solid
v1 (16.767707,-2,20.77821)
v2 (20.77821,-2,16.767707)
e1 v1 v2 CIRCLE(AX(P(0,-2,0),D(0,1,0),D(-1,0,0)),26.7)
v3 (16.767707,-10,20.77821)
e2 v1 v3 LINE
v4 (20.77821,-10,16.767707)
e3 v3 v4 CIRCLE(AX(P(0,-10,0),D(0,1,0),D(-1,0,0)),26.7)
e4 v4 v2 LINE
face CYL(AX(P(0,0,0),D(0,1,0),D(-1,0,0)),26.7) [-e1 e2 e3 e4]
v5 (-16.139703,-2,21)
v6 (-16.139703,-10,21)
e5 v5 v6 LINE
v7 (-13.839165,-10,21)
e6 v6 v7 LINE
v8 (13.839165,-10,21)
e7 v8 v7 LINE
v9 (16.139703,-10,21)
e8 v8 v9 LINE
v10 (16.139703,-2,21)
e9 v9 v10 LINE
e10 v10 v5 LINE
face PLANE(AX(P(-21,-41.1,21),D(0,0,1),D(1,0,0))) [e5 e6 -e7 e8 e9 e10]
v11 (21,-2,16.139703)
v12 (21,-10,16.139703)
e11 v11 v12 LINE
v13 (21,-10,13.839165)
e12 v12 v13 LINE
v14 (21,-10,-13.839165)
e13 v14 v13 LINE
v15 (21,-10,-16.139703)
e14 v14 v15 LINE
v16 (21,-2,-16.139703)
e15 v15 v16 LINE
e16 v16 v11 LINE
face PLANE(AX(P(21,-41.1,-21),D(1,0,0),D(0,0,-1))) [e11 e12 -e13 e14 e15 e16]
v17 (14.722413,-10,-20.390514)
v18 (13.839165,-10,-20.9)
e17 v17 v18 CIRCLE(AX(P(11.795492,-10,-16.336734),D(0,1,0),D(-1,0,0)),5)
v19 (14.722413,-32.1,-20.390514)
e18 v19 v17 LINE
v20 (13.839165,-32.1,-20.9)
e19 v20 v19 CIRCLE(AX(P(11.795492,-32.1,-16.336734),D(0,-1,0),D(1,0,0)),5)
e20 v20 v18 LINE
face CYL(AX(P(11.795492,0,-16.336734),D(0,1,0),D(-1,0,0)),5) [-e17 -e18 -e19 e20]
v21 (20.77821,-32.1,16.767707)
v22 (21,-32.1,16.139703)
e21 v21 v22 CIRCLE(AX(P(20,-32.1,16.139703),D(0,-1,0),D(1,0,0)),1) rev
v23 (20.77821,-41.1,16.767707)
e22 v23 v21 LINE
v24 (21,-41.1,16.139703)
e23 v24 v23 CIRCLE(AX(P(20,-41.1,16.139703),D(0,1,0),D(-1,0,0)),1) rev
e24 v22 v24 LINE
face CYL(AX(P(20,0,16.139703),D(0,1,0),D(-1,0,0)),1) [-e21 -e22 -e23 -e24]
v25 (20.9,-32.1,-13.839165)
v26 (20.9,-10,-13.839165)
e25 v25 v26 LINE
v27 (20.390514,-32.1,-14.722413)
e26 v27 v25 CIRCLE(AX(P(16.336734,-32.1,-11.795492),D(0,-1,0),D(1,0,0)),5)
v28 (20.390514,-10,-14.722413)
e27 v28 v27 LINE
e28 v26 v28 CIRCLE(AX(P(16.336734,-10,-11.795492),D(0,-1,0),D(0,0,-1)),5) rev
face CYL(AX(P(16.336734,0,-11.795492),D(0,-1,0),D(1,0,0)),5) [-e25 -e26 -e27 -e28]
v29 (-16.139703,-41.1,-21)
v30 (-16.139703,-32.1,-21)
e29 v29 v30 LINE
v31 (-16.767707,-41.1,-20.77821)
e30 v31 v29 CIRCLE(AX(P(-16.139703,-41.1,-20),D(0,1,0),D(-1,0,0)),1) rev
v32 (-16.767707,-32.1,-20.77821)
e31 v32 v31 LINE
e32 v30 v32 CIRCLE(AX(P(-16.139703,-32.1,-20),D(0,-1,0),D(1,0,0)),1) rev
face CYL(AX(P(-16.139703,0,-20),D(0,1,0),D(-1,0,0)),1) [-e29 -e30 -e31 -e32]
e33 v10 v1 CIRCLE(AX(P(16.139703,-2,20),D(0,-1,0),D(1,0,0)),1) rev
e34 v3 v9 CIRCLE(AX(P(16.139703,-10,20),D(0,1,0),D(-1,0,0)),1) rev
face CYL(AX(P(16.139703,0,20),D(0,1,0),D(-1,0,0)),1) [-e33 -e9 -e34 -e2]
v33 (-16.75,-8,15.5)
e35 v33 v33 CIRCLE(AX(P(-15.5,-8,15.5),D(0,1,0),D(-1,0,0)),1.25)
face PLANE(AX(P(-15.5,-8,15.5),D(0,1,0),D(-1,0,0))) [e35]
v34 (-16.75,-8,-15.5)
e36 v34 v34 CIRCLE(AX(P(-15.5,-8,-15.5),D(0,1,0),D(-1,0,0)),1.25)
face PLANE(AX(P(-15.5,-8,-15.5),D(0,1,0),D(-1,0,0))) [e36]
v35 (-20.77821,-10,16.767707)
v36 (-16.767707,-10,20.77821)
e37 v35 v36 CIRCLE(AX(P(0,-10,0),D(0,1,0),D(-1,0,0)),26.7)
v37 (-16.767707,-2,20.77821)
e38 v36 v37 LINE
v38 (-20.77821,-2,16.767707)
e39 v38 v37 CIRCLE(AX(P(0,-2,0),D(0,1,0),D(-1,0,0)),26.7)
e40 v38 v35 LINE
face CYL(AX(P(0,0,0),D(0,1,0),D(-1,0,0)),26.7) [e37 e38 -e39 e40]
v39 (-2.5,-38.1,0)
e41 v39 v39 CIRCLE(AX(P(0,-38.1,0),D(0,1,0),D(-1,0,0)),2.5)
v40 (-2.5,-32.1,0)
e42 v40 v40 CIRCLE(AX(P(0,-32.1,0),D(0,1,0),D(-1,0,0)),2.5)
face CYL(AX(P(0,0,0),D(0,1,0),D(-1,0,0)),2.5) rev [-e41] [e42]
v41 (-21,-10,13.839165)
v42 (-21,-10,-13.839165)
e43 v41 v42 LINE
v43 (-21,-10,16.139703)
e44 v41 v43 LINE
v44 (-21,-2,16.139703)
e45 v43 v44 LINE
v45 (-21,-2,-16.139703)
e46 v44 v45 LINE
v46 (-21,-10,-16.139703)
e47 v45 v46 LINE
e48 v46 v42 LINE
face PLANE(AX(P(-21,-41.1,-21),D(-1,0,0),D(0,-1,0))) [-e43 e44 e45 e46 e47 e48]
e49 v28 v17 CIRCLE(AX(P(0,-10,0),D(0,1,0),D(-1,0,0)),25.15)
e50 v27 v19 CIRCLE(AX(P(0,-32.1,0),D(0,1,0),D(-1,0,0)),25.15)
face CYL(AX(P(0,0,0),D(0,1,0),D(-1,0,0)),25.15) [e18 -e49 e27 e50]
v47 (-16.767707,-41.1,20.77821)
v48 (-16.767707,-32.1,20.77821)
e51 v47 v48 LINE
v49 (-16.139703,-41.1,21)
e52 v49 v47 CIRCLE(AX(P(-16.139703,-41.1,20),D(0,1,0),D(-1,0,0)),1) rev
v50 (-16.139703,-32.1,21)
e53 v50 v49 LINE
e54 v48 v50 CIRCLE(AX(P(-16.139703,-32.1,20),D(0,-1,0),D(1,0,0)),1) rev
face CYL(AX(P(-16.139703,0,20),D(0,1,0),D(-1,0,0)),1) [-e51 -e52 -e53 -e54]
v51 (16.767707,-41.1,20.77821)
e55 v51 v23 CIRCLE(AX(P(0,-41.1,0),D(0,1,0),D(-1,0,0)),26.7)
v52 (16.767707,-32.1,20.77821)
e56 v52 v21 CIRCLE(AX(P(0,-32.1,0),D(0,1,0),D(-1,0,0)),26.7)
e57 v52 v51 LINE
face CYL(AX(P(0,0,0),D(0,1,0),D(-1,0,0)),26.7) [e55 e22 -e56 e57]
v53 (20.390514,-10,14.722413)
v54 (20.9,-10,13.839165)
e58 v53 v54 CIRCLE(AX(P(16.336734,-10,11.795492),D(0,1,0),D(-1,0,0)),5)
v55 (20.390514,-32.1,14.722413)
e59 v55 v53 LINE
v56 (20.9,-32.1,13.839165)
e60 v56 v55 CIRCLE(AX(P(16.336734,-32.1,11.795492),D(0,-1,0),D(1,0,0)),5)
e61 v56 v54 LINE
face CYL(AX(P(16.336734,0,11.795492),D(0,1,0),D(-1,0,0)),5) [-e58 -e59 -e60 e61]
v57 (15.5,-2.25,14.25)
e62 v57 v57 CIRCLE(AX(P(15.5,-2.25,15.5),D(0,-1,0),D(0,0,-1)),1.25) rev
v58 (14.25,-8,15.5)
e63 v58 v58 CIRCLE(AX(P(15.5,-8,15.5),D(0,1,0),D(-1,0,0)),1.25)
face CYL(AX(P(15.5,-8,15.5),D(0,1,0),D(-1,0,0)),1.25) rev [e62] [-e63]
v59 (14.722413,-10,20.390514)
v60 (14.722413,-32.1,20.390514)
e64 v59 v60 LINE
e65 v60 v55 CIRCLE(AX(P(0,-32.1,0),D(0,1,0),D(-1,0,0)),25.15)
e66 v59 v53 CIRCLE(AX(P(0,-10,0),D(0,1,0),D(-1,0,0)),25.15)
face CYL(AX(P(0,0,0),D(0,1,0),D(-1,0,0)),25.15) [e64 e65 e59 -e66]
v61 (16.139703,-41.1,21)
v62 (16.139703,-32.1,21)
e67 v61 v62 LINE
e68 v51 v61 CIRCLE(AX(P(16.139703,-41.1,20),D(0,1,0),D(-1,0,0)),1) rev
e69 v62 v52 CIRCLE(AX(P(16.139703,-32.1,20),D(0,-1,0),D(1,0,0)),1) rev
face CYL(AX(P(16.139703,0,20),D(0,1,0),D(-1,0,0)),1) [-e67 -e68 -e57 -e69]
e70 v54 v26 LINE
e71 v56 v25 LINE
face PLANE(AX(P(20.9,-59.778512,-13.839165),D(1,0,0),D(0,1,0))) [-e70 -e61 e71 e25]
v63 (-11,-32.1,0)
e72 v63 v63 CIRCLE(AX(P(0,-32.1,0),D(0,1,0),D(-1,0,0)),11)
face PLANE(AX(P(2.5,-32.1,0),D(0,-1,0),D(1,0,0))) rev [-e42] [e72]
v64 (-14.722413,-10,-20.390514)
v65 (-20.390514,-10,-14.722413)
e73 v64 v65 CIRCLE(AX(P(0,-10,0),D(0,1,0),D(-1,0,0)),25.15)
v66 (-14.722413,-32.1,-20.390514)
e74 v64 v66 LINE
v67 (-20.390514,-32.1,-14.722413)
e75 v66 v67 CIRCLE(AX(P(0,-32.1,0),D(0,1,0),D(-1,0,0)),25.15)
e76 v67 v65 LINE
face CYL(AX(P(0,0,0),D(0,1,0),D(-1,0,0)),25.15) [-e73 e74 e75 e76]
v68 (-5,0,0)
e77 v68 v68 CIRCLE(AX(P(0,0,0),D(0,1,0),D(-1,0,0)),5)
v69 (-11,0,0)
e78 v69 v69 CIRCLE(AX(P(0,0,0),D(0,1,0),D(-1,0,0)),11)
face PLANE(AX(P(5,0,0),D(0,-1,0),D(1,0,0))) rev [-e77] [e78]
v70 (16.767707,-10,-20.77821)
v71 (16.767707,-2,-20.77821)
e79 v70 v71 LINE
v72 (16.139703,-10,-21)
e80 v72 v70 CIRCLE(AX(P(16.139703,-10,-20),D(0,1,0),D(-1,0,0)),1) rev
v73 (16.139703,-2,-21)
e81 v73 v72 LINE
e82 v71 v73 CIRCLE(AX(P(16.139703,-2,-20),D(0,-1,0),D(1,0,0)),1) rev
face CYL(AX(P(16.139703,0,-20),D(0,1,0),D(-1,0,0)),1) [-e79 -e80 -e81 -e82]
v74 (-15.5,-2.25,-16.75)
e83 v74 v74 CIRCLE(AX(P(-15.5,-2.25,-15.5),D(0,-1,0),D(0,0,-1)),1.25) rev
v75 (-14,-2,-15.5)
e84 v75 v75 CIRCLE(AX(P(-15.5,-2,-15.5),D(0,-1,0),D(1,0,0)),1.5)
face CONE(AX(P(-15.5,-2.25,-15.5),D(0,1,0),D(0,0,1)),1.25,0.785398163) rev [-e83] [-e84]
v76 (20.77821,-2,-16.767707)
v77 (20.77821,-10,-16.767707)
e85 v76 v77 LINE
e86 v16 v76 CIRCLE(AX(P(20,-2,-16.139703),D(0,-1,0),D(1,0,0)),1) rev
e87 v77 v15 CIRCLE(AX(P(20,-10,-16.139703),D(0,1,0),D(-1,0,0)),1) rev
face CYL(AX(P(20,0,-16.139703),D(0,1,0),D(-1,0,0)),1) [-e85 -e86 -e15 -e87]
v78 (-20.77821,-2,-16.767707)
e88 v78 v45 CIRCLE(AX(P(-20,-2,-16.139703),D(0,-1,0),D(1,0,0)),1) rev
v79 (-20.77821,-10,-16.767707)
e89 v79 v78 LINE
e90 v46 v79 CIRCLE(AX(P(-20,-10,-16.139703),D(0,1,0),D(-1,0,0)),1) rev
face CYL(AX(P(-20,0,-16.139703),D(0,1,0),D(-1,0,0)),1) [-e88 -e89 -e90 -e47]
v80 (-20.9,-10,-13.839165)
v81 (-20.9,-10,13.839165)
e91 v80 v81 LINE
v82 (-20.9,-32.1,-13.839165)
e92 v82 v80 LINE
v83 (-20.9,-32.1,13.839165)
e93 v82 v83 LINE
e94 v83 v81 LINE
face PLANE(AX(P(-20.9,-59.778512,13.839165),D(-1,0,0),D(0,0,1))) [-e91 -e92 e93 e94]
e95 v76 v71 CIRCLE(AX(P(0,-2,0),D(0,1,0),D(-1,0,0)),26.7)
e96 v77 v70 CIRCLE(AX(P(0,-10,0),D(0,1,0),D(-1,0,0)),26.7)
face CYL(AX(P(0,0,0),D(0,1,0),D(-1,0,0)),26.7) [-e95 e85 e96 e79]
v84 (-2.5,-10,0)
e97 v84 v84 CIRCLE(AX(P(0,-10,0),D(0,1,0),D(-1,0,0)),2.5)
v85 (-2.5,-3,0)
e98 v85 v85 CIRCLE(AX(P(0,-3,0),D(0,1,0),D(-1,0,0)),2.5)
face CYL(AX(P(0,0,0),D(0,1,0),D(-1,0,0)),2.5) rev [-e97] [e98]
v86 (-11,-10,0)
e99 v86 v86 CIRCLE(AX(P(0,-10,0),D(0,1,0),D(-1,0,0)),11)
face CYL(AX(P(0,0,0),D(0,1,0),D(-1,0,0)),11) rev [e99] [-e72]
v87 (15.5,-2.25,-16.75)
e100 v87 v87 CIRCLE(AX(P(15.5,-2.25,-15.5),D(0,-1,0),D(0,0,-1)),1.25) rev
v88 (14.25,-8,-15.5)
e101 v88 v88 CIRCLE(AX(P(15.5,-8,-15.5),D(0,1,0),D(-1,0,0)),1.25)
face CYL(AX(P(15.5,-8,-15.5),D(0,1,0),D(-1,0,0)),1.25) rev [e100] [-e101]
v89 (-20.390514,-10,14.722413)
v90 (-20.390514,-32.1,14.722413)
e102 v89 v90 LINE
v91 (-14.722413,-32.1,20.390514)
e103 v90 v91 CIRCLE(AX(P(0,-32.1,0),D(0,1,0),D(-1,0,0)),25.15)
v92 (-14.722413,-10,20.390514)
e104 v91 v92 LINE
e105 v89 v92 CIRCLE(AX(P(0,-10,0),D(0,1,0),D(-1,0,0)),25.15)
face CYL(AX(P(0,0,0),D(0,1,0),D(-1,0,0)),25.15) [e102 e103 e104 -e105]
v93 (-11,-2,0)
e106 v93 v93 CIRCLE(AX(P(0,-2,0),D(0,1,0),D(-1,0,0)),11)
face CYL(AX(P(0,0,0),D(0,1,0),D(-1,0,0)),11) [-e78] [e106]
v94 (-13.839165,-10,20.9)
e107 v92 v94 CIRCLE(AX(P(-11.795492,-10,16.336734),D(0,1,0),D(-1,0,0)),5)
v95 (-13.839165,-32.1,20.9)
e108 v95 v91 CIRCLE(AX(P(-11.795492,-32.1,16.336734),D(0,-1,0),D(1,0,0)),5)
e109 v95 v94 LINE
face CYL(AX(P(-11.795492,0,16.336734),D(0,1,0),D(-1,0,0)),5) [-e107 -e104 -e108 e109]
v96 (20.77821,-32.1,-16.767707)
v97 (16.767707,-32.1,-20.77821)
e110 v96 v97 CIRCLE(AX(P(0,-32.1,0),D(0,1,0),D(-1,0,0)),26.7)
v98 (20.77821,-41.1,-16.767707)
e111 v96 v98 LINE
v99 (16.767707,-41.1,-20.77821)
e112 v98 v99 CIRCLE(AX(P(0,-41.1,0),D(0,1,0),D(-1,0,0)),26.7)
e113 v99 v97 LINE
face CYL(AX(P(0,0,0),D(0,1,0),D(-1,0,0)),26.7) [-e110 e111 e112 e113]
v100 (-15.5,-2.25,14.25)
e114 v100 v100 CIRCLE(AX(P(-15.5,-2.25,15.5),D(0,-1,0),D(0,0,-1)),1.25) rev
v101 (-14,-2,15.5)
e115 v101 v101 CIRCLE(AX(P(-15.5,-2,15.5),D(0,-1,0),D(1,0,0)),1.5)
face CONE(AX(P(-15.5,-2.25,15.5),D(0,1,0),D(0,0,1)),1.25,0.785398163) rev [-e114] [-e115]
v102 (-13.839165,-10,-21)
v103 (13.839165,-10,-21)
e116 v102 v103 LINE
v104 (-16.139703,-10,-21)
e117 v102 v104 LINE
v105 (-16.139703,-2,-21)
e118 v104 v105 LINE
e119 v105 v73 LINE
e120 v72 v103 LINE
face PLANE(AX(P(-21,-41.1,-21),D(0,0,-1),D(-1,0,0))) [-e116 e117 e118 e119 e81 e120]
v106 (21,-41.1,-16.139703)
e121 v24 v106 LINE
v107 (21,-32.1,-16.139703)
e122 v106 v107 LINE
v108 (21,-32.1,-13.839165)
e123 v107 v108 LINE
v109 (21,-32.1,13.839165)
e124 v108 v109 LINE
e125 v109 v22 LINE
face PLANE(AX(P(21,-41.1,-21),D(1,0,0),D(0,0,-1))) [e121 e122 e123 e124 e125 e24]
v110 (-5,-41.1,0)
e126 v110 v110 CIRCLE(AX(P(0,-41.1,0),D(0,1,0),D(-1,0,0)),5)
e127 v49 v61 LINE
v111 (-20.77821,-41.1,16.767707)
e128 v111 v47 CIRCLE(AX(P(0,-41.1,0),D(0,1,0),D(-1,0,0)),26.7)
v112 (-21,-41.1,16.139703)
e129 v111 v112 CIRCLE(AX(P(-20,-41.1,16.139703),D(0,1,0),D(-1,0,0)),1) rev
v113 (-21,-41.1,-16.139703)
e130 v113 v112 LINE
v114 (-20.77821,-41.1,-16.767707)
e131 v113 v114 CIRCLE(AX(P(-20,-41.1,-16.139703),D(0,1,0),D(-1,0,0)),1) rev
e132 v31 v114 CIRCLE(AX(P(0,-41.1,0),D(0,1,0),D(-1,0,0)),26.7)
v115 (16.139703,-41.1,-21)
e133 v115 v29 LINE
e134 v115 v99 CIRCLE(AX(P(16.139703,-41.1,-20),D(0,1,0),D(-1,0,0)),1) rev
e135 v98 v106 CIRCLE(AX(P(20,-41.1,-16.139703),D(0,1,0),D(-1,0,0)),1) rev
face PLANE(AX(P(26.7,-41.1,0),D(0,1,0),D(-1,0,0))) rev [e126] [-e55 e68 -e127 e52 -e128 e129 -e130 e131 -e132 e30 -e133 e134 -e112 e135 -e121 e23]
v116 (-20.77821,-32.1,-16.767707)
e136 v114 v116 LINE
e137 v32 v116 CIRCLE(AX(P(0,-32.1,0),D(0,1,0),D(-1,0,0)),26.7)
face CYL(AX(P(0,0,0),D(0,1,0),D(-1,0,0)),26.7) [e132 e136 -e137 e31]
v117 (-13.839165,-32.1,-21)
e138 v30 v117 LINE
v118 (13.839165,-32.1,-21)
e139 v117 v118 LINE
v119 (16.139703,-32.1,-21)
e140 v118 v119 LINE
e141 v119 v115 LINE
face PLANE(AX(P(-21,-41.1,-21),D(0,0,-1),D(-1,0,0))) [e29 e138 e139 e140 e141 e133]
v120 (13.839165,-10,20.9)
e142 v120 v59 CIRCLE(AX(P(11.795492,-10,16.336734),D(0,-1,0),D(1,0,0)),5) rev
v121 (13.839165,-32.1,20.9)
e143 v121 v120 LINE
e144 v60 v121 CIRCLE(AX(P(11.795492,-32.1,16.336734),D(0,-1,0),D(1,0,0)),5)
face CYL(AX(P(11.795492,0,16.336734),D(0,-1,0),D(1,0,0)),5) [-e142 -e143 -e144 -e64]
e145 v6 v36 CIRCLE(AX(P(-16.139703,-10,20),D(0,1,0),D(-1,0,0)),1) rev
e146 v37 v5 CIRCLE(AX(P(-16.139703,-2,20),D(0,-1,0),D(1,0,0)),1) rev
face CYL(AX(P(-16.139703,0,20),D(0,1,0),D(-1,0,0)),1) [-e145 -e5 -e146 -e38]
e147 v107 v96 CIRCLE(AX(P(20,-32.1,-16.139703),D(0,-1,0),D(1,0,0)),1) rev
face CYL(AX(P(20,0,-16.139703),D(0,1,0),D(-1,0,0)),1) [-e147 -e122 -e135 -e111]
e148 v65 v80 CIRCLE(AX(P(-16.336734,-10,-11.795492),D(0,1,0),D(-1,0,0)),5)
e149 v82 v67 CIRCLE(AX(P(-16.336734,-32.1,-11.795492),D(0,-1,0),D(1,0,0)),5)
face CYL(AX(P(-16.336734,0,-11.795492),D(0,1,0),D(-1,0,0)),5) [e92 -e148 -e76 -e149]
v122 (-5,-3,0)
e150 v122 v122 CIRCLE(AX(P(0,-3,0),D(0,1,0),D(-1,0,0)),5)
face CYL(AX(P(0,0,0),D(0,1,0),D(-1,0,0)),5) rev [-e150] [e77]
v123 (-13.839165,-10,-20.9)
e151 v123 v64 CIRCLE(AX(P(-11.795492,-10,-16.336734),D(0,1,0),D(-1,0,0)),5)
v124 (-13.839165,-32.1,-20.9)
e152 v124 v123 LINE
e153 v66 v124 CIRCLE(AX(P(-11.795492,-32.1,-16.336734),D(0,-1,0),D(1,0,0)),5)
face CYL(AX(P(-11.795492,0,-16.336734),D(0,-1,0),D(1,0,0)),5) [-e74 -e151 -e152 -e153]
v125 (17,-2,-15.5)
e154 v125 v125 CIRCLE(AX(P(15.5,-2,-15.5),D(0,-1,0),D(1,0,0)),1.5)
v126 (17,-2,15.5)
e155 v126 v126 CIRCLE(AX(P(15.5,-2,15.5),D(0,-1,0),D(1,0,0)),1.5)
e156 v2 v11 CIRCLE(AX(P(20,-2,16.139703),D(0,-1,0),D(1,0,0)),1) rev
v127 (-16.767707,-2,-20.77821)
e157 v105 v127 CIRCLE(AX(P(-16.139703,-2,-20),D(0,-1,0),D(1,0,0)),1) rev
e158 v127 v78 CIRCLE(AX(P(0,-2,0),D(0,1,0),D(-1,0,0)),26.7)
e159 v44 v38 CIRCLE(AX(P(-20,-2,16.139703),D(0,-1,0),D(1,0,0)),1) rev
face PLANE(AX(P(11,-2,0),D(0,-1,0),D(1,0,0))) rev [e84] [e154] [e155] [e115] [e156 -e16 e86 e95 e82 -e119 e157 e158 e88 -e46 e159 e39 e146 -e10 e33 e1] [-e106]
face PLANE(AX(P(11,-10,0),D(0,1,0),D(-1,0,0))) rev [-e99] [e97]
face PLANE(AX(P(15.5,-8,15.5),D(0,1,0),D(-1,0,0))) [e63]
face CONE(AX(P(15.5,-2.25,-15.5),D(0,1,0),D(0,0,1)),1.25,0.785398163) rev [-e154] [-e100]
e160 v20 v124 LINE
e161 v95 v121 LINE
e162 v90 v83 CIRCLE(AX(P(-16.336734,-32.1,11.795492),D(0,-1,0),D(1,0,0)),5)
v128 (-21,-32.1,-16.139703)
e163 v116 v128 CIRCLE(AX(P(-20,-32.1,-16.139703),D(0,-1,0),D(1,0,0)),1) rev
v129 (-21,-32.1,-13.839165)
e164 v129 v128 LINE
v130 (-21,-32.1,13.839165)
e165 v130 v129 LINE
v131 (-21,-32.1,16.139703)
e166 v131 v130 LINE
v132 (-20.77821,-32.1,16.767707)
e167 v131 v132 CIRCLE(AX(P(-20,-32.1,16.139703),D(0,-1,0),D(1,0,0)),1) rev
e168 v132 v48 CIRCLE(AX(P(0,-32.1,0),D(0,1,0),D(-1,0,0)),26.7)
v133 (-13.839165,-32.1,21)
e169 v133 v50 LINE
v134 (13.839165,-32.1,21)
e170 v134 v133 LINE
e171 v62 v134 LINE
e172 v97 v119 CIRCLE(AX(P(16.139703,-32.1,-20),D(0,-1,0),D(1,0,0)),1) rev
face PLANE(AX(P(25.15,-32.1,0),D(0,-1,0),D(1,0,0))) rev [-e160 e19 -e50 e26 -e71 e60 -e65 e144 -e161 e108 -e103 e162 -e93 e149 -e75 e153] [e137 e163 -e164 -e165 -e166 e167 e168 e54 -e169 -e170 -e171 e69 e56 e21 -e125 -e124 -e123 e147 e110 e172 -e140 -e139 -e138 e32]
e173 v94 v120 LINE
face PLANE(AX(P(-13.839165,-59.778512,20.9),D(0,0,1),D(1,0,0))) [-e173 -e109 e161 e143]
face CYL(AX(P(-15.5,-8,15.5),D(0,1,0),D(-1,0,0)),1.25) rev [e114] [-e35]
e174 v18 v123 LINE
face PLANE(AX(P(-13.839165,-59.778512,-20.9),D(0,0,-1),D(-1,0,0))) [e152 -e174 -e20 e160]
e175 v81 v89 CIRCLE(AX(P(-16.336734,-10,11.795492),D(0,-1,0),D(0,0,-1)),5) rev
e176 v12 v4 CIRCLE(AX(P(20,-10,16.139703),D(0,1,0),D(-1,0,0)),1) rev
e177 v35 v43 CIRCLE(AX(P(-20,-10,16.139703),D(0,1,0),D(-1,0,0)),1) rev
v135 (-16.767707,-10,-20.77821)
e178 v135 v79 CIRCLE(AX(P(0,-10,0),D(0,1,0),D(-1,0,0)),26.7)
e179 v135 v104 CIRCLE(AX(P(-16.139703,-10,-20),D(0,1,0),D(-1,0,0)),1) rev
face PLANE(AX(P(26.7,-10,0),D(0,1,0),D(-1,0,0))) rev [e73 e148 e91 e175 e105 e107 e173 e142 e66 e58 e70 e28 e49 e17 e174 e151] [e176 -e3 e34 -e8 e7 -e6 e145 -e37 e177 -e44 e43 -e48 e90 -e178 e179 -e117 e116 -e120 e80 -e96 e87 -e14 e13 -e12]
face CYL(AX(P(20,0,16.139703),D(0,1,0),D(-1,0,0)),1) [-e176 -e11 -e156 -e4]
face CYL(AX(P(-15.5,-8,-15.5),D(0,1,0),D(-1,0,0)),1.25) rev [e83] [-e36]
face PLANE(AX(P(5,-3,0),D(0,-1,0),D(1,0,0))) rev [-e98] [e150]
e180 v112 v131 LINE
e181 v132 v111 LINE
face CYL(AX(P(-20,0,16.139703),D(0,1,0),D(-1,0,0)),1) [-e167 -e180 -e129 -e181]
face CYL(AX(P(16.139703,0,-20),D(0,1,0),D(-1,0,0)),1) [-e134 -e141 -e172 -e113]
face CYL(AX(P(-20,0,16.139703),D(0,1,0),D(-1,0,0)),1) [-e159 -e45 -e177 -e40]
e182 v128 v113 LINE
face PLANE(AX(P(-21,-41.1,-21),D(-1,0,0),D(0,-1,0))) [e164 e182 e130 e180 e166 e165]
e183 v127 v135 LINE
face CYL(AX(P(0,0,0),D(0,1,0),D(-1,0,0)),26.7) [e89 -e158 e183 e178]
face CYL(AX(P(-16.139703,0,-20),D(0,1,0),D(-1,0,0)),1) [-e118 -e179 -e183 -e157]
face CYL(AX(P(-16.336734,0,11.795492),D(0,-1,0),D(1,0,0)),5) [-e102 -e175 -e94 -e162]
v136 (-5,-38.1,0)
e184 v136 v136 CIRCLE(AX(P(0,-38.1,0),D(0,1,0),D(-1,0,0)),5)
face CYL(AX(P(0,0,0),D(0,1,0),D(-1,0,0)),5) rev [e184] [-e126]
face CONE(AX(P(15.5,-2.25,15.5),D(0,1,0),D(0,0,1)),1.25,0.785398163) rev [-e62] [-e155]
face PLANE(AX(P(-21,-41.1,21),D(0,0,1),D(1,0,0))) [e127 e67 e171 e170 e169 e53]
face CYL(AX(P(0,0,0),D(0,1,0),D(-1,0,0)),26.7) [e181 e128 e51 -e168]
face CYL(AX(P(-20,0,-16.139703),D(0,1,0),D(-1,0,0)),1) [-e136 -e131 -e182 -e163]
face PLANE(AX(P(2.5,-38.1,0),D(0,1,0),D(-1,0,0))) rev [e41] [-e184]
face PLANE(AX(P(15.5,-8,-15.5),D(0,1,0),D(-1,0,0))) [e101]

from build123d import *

# Parameters (mm, degrees)
SKETCH2_W          = 55
SKETCH2_H          = 55
SKETCH2_W_2        = 42
SKETCH2_H_2        = 42
CUT_EXTRUDE1_DEPTH = 55.356140408
SKETCH3_W          = 0.1
SKETCH3_H          = 27.678330874
SKETCH3_W_2        = 27.678330874
SKETCH3_H_2        = 0.1
CUT_EXTRUDE2_DEPTH = 22.1
FILLET9_R          = 5
FILLET10_R         = 1
SKETCH4_R          = 1.25
CUT_EXTRUDE3_DEPTH = 6
CHAMFER1_SIZE      = 0.25


with BuildPart() as part:
    # Sketch1 → Revolve1 (revolve)
    with BuildSketch(Plane.XY, mode=Mode.PRIVATE) as revolve1_sk:
        Polygon((5, 0), (11, 0), (11, -2), (26.7, -2), (26.7, -10), (25.15, -10), (25.15, -32.1), (26.7, -32.1), (26.7, -41.1), (5, -41.1), (5, -38.1), (2.5, -38.1), (2.5, -32.1), (11, -32.1), (11, -10), (2.5, -10), (2.5, -3), (5, -3), align=None)
    revolve(revolve1_sk.sketch.rotate(Axis((0, 0, 0), (0, -1, 0)), 180), axis=Axis((0, 0, 0), (0, -1, 0)))

    # Sketch2 → Cut-Extrude1 (cut, through all)
    with BuildSketch(Plane(origin=(0, -2, 0), x_dir=(1, 0, 0), z_dir=(0, 1, 0))):
        Rectangle(SKETCH2_W, SKETCH2_H)
        Rectangle(SKETCH2_W_2, SKETCH2_H_2, mode=Mode.SUBTRACT)
    extrude(amount=-CUT_EXTRUDE1_DEPTH, mode=Mode.SUBTRACT)

    # Sketch3 → Cut-Extrude2 (cut)
    with BuildSketch(Plane.XZ.offset(10)):
        with Locations((-20.95, 0)):
            Rectangle(SKETCH3_W, SKETCH3_H)
        with Locations((0, -20.95)):
            Rectangle(SKETCH3_W_2, SKETCH3_H_2)
        with Locations((20.95, 0)):
            Rectangle(SKETCH3_W, SKETCH3_H)
        with Locations((0, 20.95)):
            Rectangle(SKETCH3_W_2, SKETCH3_H_2)
    extrude(amount=CUT_EXTRUDE2_DEPTH, mode=Mode.SUBTRACT)

    # Fillet9
    # the kernel refuses this fillet: 5 mm, written as the material it takes off along each edge
    with BuildSketch(Plane(origin=(13.839165437, -10, -21), x_dir=(0.8230603738236033, 0, 0.5679538898901478), z_dir=(0, -1, 0)), Plane(origin=(21, -10, 13.839165437), x_dir=(-0.5679538898901461, 0, 0.8230603738236048), z_dir=(0, -1, 0)), Plane(origin=(-13.839165437, -10, 21), x_dir=(-0.8230603738236049, 0, -0.5679538898901455), z_dir=(0, -1, 0)), Plane(origin=(-21, -10, -13.839165437), x_dir=(0.567953889890148, 0, -0.8230603738236033), z_dir=(0, -1, 0))) as fillet9_piece_1:
        with BuildLine():
            CenterArc((0.966453452, 4.998861967), FILLET9_R, 259.51770896, 11.704761359)
            Line((0.056795389, 0.082306037), (0, 0))
            ThreePointArc((0, 0), (0.536563009, -0.005724307), (1.073126019, 0))
        make_face()
    extrude(amount=22.1, mode=Mode.SUBTRACT)
    with BuildSketch(Plane(origin=(21, -10, -13.839165437), x_dir=(-0.5679538898901492, 0, -0.8230603738236025), z_dir=(0, -1, 0)), Plane(origin=(13.839165437, -10, 21), x_dir=(0.8230603738236021, 0, -0.5679538898901498), z_dir=(0, -1, 0)), Plane(origin=(-21, -10, 13.839165437), x_dir=(0.5679538898901505, 0, 0.8230603738236016), z_dir=(0, -1, 0)), Plane(origin=(-13.839165437, -10, -21), x_dir=(-0.8230603738236021, 0, 0.5679538898901498), z_dir=(0, -1, 0))) as fillet9_piece_2:
        with BuildLine():
            CenterArc((0.966453452, -4.998861967), FILLET9_R, 88.777529681, 11.704761359)
            Line((0.056795389, -0.082306037), (0, 0))
            ThreePointArc((0, 0), (0.536563009, 0.005724307), (1.073126019, 0))
        make_face()
    extrude(amount=22.1, mode=Mode.SUBTRACT)

    # Fillet10
    fillet10_edges = [part.edges().sort_by_distance(p)[0] for p in [
        (21, -36.6, -16.4890873),
        (21, -6, -16.4890873),
        (16.4890873, -36.6, 21),
        (16.4890873, -6, 21),
        (-21, -36.6, 16.4890873),
        (-21, -6, 16.4890873),
        (-16.4890873, -36.6, -21),
        (-16.4890873, -6, -21),
        (21, -36.6, 16.4890873),
        (21, -6, 16.4890873),
        (-16.4890873, -36.6, 21),
        (-16.4890873, -6, 21),
        (-21, -36.6, -16.4890873),
        (-21, -6, -16.4890873),
        (16.4890873, -36.6, -21),
        (16.4890873, -6, -21),
    ]]
    fillet(fillet10_edges, radius=FILLET10_R)

    # Sketch4 → Cut-Extrude3 (cut)
    with BuildSketch(Plane(origin=(0, -2, 0), x_dir=(1, 0, 0), z_dir=(0, 1, 0))):
        with Locations(Location((-15.5, 15.5, 0), (0, 0, 180))):
            Circle(SKETCH4_R)
        with Locations(Location((15.5, 15.5, 0), (0, 0, 180))):
            Circle(SKETCH4_R)
        with Locations(Location((15.5, -15.5, 0), (0, 0, 180))):
            Circle(SKETCH4_R)
        with Locations(Location((-15.5, -15.5, 0), (0, 0, 180))):
            Circle(SKETCH4_R)
    extrude(amount=-CUT_EXTRUDE3_DEPTH, mode=Mode.SUBTRACT)

    # Chamfer1
    chamfer1_edges = [part.edges().sort_by_distance(p)[0] for p in [
        (-14.25, -2, -15.5),
        (16.75, -2, -15.5),
        (16.75, -2, 15.5),
        (-14.25, -2, 15.5),
    ]]
    chamfer(chamfer1_edges, length=CHAMFER1_SIZE)


solid = part.part
